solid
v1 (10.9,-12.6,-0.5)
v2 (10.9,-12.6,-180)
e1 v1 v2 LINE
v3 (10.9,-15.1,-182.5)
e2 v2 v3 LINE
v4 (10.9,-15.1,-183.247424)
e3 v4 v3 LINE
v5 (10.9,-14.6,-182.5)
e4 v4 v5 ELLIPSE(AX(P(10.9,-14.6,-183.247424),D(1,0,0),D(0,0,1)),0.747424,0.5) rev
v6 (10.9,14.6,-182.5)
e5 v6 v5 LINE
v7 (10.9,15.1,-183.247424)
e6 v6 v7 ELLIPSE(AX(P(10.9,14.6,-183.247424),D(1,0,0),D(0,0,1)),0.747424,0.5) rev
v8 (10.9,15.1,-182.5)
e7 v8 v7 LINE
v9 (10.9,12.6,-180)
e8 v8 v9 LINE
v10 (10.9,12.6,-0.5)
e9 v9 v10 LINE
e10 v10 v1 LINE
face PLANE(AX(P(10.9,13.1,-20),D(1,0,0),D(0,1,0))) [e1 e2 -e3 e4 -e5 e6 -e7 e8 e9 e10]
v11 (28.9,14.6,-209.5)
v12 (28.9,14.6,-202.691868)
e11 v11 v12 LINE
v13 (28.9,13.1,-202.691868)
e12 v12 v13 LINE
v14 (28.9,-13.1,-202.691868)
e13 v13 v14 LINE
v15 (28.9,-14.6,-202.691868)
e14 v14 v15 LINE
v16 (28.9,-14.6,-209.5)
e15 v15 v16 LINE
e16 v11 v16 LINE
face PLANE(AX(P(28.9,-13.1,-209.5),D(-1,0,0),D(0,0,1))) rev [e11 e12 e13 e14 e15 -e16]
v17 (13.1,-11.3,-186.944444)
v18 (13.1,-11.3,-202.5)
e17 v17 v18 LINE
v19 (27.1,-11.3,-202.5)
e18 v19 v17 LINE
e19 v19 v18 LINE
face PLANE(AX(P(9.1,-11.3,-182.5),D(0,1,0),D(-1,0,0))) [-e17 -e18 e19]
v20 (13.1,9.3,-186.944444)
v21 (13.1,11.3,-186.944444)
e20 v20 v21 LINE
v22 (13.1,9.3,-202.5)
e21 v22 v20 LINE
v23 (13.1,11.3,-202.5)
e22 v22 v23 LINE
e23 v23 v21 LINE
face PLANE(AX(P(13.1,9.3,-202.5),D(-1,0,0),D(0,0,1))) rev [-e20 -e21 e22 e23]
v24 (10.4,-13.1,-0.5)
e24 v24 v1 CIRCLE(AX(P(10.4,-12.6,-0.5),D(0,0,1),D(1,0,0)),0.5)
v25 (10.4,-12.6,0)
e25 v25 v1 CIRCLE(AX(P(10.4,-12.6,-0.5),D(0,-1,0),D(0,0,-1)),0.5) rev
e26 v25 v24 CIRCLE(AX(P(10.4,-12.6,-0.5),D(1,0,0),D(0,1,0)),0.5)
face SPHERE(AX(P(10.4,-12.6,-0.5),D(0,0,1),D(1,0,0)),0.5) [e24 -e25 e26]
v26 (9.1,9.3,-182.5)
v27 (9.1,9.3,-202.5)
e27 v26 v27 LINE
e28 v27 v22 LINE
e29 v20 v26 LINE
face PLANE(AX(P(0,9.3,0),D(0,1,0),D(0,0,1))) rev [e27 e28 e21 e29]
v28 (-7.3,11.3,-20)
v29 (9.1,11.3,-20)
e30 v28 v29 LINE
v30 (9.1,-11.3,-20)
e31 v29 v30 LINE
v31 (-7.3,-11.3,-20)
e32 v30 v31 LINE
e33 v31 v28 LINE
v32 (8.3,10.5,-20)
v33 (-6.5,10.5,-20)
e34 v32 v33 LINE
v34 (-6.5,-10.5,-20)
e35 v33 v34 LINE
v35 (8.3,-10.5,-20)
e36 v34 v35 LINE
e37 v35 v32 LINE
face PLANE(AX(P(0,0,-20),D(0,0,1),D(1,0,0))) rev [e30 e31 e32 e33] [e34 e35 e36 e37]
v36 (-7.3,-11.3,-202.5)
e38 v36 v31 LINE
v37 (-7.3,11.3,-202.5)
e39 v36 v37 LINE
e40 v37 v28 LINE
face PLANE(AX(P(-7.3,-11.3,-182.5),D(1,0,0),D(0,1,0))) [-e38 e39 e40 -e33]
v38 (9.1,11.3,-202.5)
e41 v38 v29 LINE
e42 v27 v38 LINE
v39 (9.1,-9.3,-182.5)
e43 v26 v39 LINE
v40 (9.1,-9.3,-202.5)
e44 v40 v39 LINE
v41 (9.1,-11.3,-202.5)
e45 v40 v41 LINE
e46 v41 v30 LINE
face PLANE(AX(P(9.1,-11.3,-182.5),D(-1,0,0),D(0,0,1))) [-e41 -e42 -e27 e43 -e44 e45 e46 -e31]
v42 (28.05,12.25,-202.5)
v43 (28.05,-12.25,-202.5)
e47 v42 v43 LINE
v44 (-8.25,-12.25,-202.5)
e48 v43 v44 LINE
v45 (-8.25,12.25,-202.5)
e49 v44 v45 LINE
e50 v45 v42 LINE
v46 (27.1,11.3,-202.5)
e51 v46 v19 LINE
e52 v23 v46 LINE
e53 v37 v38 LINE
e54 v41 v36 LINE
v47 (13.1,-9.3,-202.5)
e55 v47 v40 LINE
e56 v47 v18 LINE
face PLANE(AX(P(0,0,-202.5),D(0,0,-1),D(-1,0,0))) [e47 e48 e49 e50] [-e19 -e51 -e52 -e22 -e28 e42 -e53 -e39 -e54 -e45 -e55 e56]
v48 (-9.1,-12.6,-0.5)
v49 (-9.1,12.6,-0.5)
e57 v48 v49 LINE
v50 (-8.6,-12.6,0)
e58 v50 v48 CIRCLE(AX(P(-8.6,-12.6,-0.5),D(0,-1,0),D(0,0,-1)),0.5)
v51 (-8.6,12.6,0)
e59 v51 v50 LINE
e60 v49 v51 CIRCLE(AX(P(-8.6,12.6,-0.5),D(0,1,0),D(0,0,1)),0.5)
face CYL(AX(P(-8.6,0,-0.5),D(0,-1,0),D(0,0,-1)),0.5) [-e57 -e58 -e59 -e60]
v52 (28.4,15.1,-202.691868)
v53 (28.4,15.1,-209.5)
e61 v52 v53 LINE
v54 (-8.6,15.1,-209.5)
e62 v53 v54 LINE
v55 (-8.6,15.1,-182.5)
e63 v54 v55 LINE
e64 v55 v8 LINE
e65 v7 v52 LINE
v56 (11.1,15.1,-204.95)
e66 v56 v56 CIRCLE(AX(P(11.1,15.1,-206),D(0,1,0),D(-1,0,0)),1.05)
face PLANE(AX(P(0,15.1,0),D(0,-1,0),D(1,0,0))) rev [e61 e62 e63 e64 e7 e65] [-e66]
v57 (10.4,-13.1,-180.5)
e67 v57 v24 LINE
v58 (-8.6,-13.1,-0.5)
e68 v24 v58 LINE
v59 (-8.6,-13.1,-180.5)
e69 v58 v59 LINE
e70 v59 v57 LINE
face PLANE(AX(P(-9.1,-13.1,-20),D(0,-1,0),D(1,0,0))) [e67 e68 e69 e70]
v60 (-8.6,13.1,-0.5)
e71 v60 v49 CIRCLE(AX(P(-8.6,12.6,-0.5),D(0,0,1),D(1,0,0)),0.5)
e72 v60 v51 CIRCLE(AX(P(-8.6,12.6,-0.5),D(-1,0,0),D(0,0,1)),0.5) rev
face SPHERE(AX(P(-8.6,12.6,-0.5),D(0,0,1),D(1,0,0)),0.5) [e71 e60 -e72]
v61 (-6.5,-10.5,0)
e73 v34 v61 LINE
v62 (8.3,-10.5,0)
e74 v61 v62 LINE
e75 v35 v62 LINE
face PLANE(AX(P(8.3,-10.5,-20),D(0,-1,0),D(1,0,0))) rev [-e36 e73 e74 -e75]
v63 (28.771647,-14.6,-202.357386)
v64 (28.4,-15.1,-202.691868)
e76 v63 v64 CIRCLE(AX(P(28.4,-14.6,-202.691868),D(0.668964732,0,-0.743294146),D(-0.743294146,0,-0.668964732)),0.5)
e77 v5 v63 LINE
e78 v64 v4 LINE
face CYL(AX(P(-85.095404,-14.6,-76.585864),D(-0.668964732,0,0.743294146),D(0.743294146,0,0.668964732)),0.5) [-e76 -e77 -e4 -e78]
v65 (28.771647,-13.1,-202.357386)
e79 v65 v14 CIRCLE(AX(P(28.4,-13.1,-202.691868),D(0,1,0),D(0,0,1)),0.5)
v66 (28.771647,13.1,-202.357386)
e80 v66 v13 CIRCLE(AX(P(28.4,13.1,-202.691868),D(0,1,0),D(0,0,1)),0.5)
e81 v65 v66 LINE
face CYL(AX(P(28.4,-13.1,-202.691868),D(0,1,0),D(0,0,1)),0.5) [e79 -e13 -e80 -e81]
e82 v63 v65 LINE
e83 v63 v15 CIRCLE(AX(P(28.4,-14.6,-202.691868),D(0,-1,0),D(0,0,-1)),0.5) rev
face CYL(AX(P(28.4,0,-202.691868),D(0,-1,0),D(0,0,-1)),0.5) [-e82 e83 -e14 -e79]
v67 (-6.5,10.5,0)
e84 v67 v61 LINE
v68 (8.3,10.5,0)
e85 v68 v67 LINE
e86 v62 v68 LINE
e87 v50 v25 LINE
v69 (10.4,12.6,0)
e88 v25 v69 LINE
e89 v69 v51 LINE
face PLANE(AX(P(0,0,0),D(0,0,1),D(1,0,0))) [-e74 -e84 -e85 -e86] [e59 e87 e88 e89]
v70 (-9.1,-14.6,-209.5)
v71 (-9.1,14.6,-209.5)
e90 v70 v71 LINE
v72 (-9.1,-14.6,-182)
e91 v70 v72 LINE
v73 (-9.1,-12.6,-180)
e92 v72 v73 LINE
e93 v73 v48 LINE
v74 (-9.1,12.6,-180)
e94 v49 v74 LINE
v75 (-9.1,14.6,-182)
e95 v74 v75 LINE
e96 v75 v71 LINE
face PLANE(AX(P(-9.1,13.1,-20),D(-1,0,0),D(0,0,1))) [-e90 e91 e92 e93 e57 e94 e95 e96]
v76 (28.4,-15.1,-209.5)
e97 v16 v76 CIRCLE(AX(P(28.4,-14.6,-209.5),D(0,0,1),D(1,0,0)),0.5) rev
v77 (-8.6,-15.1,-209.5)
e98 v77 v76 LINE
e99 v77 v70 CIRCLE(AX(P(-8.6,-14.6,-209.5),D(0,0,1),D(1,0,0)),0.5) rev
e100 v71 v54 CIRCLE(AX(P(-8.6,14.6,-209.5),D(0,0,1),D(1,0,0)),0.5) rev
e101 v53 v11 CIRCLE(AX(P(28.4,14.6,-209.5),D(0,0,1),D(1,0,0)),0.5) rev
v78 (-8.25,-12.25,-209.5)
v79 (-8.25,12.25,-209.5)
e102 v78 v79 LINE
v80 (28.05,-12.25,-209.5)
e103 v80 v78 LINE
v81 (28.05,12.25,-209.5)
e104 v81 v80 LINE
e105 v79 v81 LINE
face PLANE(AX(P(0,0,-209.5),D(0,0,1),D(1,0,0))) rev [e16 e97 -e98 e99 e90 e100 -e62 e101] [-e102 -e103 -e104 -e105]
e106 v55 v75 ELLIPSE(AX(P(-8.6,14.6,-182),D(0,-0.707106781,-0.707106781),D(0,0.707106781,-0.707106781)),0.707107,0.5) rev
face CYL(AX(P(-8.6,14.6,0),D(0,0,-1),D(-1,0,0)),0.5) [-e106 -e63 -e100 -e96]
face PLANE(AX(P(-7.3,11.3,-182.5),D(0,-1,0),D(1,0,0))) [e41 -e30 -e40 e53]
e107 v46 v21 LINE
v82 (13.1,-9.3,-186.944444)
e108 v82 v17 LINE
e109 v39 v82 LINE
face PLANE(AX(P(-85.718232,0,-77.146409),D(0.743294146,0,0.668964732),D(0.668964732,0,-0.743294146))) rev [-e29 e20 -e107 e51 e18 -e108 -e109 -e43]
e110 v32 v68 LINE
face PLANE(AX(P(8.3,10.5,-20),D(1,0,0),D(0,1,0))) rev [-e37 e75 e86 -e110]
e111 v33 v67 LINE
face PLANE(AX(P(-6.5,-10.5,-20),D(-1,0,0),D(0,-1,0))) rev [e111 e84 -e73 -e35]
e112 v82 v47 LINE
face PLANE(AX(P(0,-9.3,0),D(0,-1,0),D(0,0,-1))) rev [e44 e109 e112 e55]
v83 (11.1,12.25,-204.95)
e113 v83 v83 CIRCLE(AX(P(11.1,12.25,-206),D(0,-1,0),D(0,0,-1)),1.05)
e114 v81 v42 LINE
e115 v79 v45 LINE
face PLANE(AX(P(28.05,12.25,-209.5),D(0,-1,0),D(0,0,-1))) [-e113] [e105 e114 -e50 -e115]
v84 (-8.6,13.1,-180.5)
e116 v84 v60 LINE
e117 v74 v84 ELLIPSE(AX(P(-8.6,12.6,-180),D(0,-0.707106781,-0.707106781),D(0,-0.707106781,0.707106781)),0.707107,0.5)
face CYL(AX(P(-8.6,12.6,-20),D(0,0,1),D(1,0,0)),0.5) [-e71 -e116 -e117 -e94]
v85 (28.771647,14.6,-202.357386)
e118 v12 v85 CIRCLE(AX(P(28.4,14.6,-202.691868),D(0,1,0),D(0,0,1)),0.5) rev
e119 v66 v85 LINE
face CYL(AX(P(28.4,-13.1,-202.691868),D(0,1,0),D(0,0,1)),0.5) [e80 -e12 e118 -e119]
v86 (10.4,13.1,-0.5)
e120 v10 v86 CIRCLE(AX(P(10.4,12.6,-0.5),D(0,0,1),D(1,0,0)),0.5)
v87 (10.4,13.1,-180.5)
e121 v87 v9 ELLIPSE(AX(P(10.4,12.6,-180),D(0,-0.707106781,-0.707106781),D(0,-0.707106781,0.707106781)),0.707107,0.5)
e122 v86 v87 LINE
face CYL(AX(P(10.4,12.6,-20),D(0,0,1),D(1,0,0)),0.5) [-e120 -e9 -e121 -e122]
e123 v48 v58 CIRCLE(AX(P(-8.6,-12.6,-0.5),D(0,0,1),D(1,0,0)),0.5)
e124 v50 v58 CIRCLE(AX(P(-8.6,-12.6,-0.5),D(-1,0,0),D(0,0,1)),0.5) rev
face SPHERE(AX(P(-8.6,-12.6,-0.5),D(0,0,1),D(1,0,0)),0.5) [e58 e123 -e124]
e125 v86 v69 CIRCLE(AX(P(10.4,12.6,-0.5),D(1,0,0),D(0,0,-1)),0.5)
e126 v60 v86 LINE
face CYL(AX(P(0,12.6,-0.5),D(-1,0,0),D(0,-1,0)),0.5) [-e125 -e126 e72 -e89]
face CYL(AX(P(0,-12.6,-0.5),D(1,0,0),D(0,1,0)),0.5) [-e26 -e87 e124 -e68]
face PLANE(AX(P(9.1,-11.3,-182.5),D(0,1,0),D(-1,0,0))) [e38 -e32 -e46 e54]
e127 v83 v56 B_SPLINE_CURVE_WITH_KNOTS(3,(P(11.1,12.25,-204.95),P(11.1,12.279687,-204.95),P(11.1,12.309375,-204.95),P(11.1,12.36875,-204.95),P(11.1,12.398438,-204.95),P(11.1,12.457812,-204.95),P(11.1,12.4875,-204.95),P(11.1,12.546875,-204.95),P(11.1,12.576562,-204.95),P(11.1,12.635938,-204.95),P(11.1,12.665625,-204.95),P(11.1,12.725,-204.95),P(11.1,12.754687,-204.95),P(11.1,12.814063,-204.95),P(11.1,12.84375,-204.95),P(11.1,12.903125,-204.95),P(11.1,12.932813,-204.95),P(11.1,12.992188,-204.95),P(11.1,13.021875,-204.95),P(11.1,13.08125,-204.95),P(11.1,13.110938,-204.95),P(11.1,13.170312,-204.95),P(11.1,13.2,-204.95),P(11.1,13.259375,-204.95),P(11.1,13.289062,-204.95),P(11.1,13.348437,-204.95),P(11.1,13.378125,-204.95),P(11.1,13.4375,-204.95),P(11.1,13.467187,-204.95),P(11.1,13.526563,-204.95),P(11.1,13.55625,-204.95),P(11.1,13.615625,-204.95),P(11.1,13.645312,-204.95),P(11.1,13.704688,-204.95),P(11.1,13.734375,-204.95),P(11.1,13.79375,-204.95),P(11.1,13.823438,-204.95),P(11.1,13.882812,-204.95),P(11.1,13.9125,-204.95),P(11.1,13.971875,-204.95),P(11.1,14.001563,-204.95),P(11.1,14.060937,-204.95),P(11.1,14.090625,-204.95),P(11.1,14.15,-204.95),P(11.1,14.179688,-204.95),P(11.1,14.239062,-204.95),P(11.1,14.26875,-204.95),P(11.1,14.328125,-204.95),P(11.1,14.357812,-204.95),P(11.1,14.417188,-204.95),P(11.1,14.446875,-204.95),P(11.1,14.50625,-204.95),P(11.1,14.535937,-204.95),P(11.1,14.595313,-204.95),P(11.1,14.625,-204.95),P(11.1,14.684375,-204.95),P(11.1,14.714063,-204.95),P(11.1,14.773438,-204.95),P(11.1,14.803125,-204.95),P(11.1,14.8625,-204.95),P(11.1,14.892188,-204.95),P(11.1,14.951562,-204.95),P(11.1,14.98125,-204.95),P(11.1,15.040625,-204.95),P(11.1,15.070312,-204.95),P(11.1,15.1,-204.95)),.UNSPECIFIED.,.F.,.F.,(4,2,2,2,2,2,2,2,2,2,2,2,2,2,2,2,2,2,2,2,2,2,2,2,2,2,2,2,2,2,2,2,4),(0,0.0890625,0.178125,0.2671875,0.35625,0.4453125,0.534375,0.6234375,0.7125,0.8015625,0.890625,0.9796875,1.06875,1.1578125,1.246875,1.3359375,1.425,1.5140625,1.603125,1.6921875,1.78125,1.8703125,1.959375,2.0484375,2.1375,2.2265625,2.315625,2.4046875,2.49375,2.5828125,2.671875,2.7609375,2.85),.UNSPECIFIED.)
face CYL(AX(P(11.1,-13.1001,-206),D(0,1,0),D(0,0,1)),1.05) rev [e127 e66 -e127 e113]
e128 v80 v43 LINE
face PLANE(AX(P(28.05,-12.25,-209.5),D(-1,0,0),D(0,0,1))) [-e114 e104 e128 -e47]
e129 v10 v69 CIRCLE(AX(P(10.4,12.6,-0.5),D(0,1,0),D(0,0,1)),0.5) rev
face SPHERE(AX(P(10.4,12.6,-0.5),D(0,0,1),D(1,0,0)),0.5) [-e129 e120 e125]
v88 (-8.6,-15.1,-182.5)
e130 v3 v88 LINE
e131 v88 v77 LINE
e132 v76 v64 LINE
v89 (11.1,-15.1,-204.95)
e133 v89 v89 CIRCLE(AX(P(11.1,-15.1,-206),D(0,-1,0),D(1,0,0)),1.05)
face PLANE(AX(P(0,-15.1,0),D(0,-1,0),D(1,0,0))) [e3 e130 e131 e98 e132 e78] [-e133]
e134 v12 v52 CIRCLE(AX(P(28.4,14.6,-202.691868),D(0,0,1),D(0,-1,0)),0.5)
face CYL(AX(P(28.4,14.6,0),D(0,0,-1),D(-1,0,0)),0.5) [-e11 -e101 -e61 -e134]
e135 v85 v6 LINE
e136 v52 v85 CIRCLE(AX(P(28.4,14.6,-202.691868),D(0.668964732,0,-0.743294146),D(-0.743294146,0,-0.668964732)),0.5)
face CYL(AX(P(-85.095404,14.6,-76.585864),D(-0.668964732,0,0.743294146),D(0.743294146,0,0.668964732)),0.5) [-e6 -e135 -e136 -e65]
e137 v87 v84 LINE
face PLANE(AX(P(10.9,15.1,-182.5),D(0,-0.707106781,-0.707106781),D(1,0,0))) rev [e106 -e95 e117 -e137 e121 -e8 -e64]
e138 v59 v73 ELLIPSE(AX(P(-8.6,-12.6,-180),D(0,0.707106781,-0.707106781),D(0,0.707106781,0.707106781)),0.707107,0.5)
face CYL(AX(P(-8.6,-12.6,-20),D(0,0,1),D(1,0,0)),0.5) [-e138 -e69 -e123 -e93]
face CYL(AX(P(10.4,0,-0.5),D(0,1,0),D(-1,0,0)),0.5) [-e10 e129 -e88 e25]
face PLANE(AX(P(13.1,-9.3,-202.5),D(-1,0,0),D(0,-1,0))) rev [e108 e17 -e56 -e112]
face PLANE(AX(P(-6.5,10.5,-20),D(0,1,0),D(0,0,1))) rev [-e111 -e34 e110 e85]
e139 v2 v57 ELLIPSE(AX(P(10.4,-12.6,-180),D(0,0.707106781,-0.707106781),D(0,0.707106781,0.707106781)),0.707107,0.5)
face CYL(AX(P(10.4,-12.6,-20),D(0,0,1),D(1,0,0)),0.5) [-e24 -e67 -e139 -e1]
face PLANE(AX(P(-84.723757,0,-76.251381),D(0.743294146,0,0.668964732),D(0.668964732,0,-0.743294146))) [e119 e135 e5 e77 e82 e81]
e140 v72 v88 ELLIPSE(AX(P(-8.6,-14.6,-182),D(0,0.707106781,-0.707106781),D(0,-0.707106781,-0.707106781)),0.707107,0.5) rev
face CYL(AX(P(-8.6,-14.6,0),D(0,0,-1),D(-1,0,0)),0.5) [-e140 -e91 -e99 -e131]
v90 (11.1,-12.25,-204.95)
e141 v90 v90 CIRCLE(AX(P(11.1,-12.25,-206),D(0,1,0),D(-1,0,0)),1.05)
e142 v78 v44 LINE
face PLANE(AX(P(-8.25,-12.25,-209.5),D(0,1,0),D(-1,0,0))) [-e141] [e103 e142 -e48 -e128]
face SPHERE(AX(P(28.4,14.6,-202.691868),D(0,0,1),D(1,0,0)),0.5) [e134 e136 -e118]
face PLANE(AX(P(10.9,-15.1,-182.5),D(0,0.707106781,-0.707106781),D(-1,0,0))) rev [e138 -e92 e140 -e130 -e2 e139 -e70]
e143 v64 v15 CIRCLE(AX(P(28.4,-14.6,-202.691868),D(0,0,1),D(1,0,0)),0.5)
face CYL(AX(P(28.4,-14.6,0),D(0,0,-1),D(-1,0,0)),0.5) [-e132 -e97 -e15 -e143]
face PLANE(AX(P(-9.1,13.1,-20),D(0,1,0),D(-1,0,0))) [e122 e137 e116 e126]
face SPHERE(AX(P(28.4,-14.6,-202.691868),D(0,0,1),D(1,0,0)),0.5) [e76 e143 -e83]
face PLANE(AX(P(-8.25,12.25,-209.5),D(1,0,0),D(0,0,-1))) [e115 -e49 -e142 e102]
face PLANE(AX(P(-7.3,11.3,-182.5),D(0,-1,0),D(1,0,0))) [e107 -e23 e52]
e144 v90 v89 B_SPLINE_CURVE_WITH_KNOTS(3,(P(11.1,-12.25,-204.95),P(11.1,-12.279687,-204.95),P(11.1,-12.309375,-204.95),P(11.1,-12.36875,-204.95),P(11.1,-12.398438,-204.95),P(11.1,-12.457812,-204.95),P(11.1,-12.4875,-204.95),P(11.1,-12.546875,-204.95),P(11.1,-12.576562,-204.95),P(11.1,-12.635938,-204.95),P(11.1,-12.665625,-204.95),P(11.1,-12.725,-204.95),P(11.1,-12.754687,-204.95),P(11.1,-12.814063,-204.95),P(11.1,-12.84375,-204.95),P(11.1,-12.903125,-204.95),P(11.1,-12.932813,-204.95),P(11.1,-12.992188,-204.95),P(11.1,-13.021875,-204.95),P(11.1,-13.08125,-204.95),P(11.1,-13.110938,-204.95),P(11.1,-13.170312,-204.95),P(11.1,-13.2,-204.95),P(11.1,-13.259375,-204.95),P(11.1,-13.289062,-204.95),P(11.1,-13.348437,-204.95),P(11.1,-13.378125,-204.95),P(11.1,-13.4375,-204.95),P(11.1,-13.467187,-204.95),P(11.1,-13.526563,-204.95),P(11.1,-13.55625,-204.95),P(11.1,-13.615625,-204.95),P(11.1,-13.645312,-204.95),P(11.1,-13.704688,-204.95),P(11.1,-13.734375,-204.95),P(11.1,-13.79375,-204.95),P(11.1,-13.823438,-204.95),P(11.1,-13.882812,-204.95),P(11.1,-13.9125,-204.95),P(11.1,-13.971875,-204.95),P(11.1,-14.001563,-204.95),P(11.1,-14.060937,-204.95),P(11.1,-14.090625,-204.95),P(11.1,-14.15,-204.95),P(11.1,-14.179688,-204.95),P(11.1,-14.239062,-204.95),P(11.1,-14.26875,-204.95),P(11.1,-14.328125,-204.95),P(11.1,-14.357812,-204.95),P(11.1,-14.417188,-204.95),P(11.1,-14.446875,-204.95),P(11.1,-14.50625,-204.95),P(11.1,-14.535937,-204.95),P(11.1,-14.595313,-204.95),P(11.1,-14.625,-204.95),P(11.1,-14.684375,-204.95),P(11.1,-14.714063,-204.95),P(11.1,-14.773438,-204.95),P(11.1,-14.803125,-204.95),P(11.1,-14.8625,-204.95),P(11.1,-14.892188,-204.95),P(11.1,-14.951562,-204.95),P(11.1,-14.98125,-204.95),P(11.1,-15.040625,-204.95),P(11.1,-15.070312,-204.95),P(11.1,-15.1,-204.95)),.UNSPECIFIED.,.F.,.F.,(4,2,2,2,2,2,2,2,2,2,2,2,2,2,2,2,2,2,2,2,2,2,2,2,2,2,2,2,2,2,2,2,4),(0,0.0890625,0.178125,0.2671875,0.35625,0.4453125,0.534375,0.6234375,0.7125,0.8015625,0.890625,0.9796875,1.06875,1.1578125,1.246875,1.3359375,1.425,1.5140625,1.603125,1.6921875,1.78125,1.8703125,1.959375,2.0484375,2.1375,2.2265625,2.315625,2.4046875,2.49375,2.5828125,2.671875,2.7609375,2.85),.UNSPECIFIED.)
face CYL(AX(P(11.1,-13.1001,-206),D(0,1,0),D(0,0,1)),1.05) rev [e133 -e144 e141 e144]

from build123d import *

# Parameters (mm, degrees)
SKETCH1_W               = 20
SKETCH1_H               = 26.2
SKETCH1_W_2             = 14.8
SKETCH1_H_2             = 21
TOP_DEPTH               = 20
SKETCH2_W               = 20
SKETCH2_H               = 26.2
SKETCH2_W_2             = 16.4
SKETCH2_H_2             = 22.6
BODY_DEPTH              = 162.5
SKETCH13_W              = 38
SKETCH13_H              = 26.2
SKETCH13_W_2            = 36.3
SKETCH13_H_2            = 24.5
INSERT_DEPTH            = 7
CUT_EXTRUDE1_DEPTH      = 212.889287248
CUT_EXTRUDE1_DEPTH_BACK = 212.889287248
SKETCH15_R              = 1.05
BOSS_EXTRUDE1_DEPTH     = 2
BOSS_EXTRUDE2_DEPTH     = 2
SKETCH19_R              = 1.05
BOSS_EXTRUDE3_DEPTH     = 2
BOSS_EXTRUDE4_START     = 2
SKETCH20_R              = 1.05
BOSS_EXTRUDE4_DEPTH     = 2
CHAMFER1_SIZE           = 2
FILLET1_R               = 0.5


# Some blends are built 0.0001 mm under size
with BuildPart() as part:
    # Sketch1 → Top (new body)
    with BuildSketch(Plane.XY):
        with Locations((0.9, 0)):
            Rectangle(SKETCH1_W, SKETCH1_H)
        with Locations((0.9, 0)):
            Rectangle(SKETCH1_W_2, SKETCH1_H_2, mode=Mode.SUBTRACT)
    extrude(amount=-TOP_DEPTH)

    # Sketch2 → Body (add)
    with BuildSketch(Plane(origin=(0, 0, -20), x_dir=(-1, 0, 0), z_dir=(0, 0, -1))):
        with Locations((-0.9, 0)):
            Rectangle(SKETCH2_W, SKETCH2_H)
        with Locations((-0.9, 0)):
            Rectangle(SKETCH2_W_2, SKETCH2_H_2, mode=Mode.SUBTRACT)
    extrude(amount=BODY_DEPTH)

    # Sketch10 → Loft3 section 0
    with BuildSketch(Plane(origin=(0, 0, -202.5), x_dir=(-1, 0, 0), z_dir=(0, 0, -1))):
        with BuildLine():
            Line((-28.9, -13.1), (9.1, -13.1))
            Line((9.1, -13.1), (9.1, 13.1))
            Line((9.1, 13.1), (-28.9, 13.1))
            Line((-28.9, 13.1), (-28.9, -13.1))
        make_face()
    # Sketch8 → Loft3 section 1
    with BuildSketch(Plane(origin=(0, 0, -182.5), x_dir=(-1, 0, 0), z_dir=(0, 0, -1))):
        with BuildLine():
            Line((9.1, 13.1), (-10.9, 13.1))
            Line((-10.9, 13.1), (-10.9, -13.1))
            Line((-10.9, -13.1), (9.1, -13.1))
            Line((9.1, -13.1), (9.1, 13.1))
        make_face()
    loft()

    # Sketch12 → Cut-Loft1 section 0
    with BuildSketch(Plane(origin=(0, 0, -202.5), x_dir=(-1, 0, 0), z_dir=(0, 0, -1))):
        with BuildLine():
            Line((7.3, -11.3), (7.3, 11.3))
            Line((7.3, 11.3), (-27.1, 11.3))
            Line((-27.1, 11.3), (-27.1, -11.3))
            Line((-27.1, -11.3), (7.3, -11.3))
        make_face()
    # Sketch11 → Cut-Loft1 section 1
    with BuildSketch(Plane(origin=(0, 0, -182.5), x_dir=(-1, 0, 0), z_dir=(0, 0, -1))):
        with BuildLine():
            Line((-9.1, 11.3), (-9.1, -11.3))
            Line((-9.1, -11.3), (7.3, -11.3))
            Line((7.3, -11.3), (7.3, 11.3))
            Line((7.3, 11.3), (-9.1, 11.3))
        make_face()
    loft(mode=Mode.SUBTRACT)

    # Sketch13 → Insert (add)
    with BuildSketch(Plane(origin=(0, 0, -202.5), x_dir=(-1, 0, 0), z_dir=(0, 0, -1))):
        with Locations((-9.9, 0)):
            Rectangle(SKETCH13_W, SKETCH13_H)
        with Locations((-9.9, 0)):
            Rectangle(SKETCH13_W_2, SKETCH13_H_2, mode=Mode.SUBTRACT)
    extrude(amount=INSERT_DEPTH)

    # Sketch15 → Cut-Extrude1 (cut, two sides: drawn at the far end of the back side and taken through both)
    with BuildSketch(Plane(origin=(0, 0, 0), x_dir=(1, 0, 0), z_dir=(0, 1, 0)).offset(-CUT_EXTRUDE1_DEPTH_BACK)):
        with Locations(Location((11.1, 206, 0), (0, 0, 270))):
            Circle(SKETCH15_R)
    extrude(amount=CUT_EXTRUDE1_DEPTH + CUT_EXTRUDE1_DEPTH_BACK, mode=Mode.SUBTRACT)

    # Sketch17 → Boss-Extrude1 (add)
    with BuildSketch(Plane.XZ.offset(-11.3)):
        Polygon((13.1, -202.5), (13.1, -186.944444444), (9.1, -182.5), (9.1, -202.5), align=None)
    extrude(amount=BOSS_EXTRUDE1_DEPTH)

    # Sketch18 → Boss-Extrude2 (add)
    with BuildSketch(Plane(origin=(0, -11.3, 0), x_dir=(1, 0, 0), z_dir=(0, 1, 0))):
        Polygon((13.1, 202.5), (9.1, 202.5), (9.1, 182.5), (13.1, 186.944444444), align=None)
    extrude(amount=BOSS_EXTRUDE2_DEPTH)

    # Sketch19 → Boss-Extrude3 (add)
    with BuildSketch(Plane.XZ.offset(13.1)):
        Polygon((28.9, -209.5), (-9.1, -209.5), (-9.1, -182.5), (10.9, -182.5), (28.9, -202.5), align=None)
        with Locations(Location((11.1, -206, 0), (0, 0, 90))):
            Circle(SKETCH19_R, mode=Mode.SUBTRACT)
    extrude(amount=BOSS_EXTRUDE3_DEPTH)

    # Sketch20 → Boss-Extrude4 (add)
    with BuildSketch(Plane(origin=(0, 13.1, 0), x_dir=(1, 0, 0), z_dir=(0, 1, 0)).offset(BOSS_EXTRUDE4_START)):
        Polygon((-9.1, 209.5), (28.9, 209.5), (28.9, 202.5), (10.9, 182.5), (-9.1, 182.5), align=None)
        with Locations(Location((11.1, 206, 0), (0, 0, 270))):
            Circle(SKETCH20_R, mode=Mode.SUBTRACT)
    extrude(amount=-BOSS_EXTRUDE4_DEPTH)

    # Chamfer1
    chamfer1_edges = [part.edges().sort_by_distance(p)[0] for p in [
        (0.9, 13.1, -182.5),
        (0.9, -13.1, -182.5),
    ]]
    chamfer(chamfer1_edges, length=CHAMFER1_SIZE - 0.0001)  # a hair under: the kernel refuses the full size

    # Fillet1
    # the kernel refuses this fillet: 0.5 mm, written as the material it takes off along each edge
    with BuildSketch(Plane(origin=(28.4, -14.6, -202.691868003), x_dir=(0.7432941462471656, 0, 0.6689647316224505), z_dir=(0, -1, 0))) as fillet1_piece_1_section:
        Polygon((0, 0), (FILLET1_R * 1.02, 0), (FILLET1_R * 1.02, -FILLET1_R * 0.391410725335), (FILLET1_R * 0.758160029172, -FILLET1_R * 0.682344026255), align=None)
    fillet1_piece_1 = extrude(amount=FILLET1_R * 1.02, mode=Mode.PRIVATE)
    fillet1_piece_1 = fillet1_piece_1 - Plane(origin=(28.4, -14.6, -202.691868003), x_dir=(-0.9336204116896668, 0, -0.3582637671833662), z_dir=(0, -1, 0)) * Sphere(FILLET1_R, mode=Mode.PRIVATE)
    add(fillet1_piece_1, mode=Mode.SUBTRACT)
    with BuildSketch(Plane(origin=(28.4, 14.6, -202.691868003), x_dir=(1, 0, 0), z_dir=(0, 1, 0))) as fillet1_piece_2_section:
        Polygon((0, 0), (FILLET1_R * 1.02, 0), (FILLET1_R * 1.02, -FILLET1_R * 0.391410725335), (FILLET1_R * 0.758160029172, -FILLET1_R * 0.682344026255), align=None)
    fillet1_piece_2 = extrude(amount=FILLET1_R * 1.02, mode=Mode.PRIVATE)
    fillet1_piece_2 = fillet1_piece_2 - Plane(origin=(28.4, 14.6, -202.691868003), x_dir=(-0.9336204116896668, 0, -0.3582637671833662), z_dir=(0, 1, 0)) * Sphere(FILLET1_R, mode=Mode.PRIVATE)
    add(fillet1_piece_2, mode=Mode.SUBTRACT)
    with BuildSketch(Plane(origin=(10.4, -12.6, -0.5), x_dir=(0, -1, 0), z_dir=(1, 0, 0))) as fillet1_piece_3_section:
        Polygon((0, 0), (FILLET1_R * 1.02, 0), (FILLET1_R * 1.02, -FILLET1_R * 1.02), (0, -FILLET1_R * 1.02), align=None)
    fillet1_piece_3 = extrude(amount=FILLET1_R * 1.02, mode=Mode.PRIVATE)
    fillet1_piece_3 = fillet1_piece_3 - Plane(origin=(10.4, -12.6, -0.5), x_dir=(0, 0.7071067811865475, -0.7071067811865475), z_dir=(1, 0, 0)) * Sphere(FILLET1_R, mode=Mode.PRIVATE)
    add(fillet1_piece_3, mode=Mode.SUBTRACT)
    with BuildSketch(Plane(origin=(-8.6, -12.6, -0.5), x_dir=(0, -1, 0), z_dir=(-1, 0, 0))) as fillet1_piece_4_section:
        Polygon((0, 0), (FILLET1_R * 1.02, 0), (FILLET1_R * 1.02, FILLET1_R * 1.02), (0, FILLET1_R * 1.02), align=None)
    fillet1_piece_4 = extrude(amount=FILLET1_R * 1.02, mode=Mode.PRIVATE)
    fillet1_piece_4 = fillet1_piece_4 - Plane(origin=(-8.6, -12.6, -0.5), x_dir=(0, 0.7071067811865475, -0.7071067811865475), z_dir=(-1, 0, 0)) * Sphere(FILLET1_R, mode=Mode.PRIVATE)
    add(fillet1_piece_4, mode=Mode.SUBTRACT)
    with BuildSketch(Plane(origin=(-8.6, 12.6, -0.5), x_dir=(0, 0, 1), z_dir=(-1, 0, 0))) as fillet1_piece_5_section:
        Polygon((0, 0), (FILLET1_R * 1.02, 0), (FILLET1_R * 1.02, FILLET1_R * 1.02), (0, FILLET1_R * 1.02), align=None)
    fillet1_piece_5 = extrude(amount=FILLET1_R * 1.02, mode=Mode.PRIVATE)
    fillet1_piece_5 = fillet1_piece_5 - Plane(origin=(-8.6, 12.6, -0.5), x_dir=(0, -0.7071067811865475, -0.7071067811865475), z_dir=(-1, 0, 0)) * Sphere(FILLET1_R, mode=Mode.PRIVATE)
    add(fillet1_piece_5, mode=Mode.SUBTRACT)
    with BuildSketch(Plane(origin=(10.4, 12.6, -0.5), x_dir=(0, 0, 1), z_dir=(1, 0, 0))) as fillet1_piece_6_section:
        Polygon((0, 0), (FILLET1_R * 1.02, 0), (FILLET1_R * 1.02, -FILLET1_R * 1.02), (0, -FILLET1_R * 1.02), align=None)
    fillet1_piece_6 = extrude(amount=FILLET1_R * 1.02, mode=Mode.PRIVATE)
    fillet1_piece_6 = fillet1_piece_6 - Plane(origin=(10.4, 12.6, -0.5), x_dir=(0, -0.7071067811865475, -0.7071067811865475), z_dir=(1, 0, 0)) * Sphere(FILLET1_R, mode=Mode.PRIVATE)
    add(fillet1_piece_6, mode=Mode.SUBTRACT)
    with BuildSketch(Plane(origin=(28.9, -15.1, -202.691868003), x_dir=(0, 1, 0), z_dir=(0, 0, -1))) as fillet1_piece_7:
        with BuildLine():
            CenterArc((FILLET1_R, -FILLET1_R), FILLET1_R, 90, 90)
            Line((0, -FILLET1_R), (0, 0))
            Line((0, 0), (FILLET1_R, 0))
        make_face()
    extrude(amount=8.058131997, mode=Mode.SUBTRACT)
    with BuildSketch(Plane(origin=(10.063794085, -15.1, -181.570882317), x_dir=(-0.7432941462471663, 0, -0.6689647316224498), z_dir=(0.6689647316224498, 0, -0.7432941462471663))) as fillet1_piece_8_section:
        with BuildLine():
            CenterArc((FILLET1_R, FILLET1_R), FILLET1_R, 180, 90)
            Line((0, FILLET1_R), (0, 0))
            Line((0, 0), (FILLET1_R, 0))
        make_face()
    fillet1_piece_8 = extrude(amount=27.965380092, mode=Mode.PRIVATE)
    fillet1_piece_8 = split(fillet1_piece_8, bisect_by=Plane(origin=(10.9, -14.988099969, -192.54912701), z_dir=(1, 0, 0)), keep=Keep.TOP, mode=Mode.PRIVATE)
    add(fillet1_piece_8, mode=Mode.SUBTRACT)
    with BuildSketch(Plane(origin=(-9.1, -15.1, -210.75), x_dir=(1, 0, 0), z_dir=(0, 0, 1)), Plane(origin=(-9.1, 15.1, -181.25), x_dir=(1, 0, 0), z_dir=(0, 0, -1))) as fillet1_piece_9:
        with BuildLine():
            CenterArc((FILLET1_R, FILLET1_R), FILLET1_R, 180, 90)
            Line((0, FILLET1_R), (0, 0))
            Line((0, 0), (FILLET1_R, 0))
        make_face()
    extrude(amount=29.5, mode=Mode.SUBTRACT)
    with BuildSketch(Plane(origin=(28.9, -14.6, -202.5), x_dir=(0, 0, -1), z_dir=(0, 1, 0))) as fillet1_piece_10:
        with BuildLine():
            CenterArc((FILLET1_R * 0.38373600523, FILLET1_R), FILLET1_R, 228.012787504, 41.987212496)
            Line((-FILLET1_R * 0.285228726392, FILLET1_R * 0.256705853753), (0, 0))
            Line((0, 0), (FILLET1_R * 0.38373600523, 0))
        make_face()
    extrude(amount=29.2, mode=Mode.SUBTRACT)
    with BuildSketch(Plane(origin=(28.771647073, 15.1, -202.357385637), x_dir=(-0.7432941462471662, 0, -0.66896473162245), z_dir=(-0.66896473162245, 0, 0.743294146247166))) as fillet1_piece_11_section:
        with BuildLine():
            CenterArc((FILLET1_R, FILLET1_R), FILLET1_R, 180, 90)
            Line((0, FILLET1_R), (0, 0))
            Line((0, 0), (FILLET1_R, 0))
        make_face()
    fillet1_piece_11 = extrude(amount=27.965380092, mode=Mode.PRIVATE)
    fillet1_piece_11 = split(fillet1_piece_11, bisect_by=Plane(origin=(10.9, 14.988099969, -192.54912701), z_dir=(1, 0, 0)), keep=Keep.TOP, mode=Mode.PRIVATE)
    add(fillet1_piece_11, mode=Mode.SUBTRACT)
    with BuildSketch(Plane(origin=(28.9, 15.1, -210.75), x_dir=(-1, 0, 0), z_dir=(0, 0, 1))) as fillet1_piece_12:
        with BuildLine():
            CenterArc((FILLET1_R, FILLET1_R), FILLET1_R, 180, 90)
            Line((0, FILLET1_R), (0, 0))
            Line((0, 0), (FILLET1_R, 0))
        make_face()
    extrude(amount=8.058131997, mode=Mode.SUBTRACT)
    with BuildSketch(Plane(origin=(10.9, -13.1, -0.5), x_dir=(0, 1, 0), z_dir=(0, 0, -1))) as fillet1_piece_13_section:
        with BuildLine():
            CenterArc((FILLET1_R, -FILLET1_R), FILLET1_R, 90, 90)
            Line((0, -FILLET1_R), (0, 0))
            Line((0, 0), (FILLET1_R, 0))
        make_face()
    fillet1_piece_13 = extrude(amount=181.2501, mode=Mode.PRIVATE)
    fillet1_piece_13 = split(fillet1_piece_13, bisect_by=Plane(origin=(10.788287286, 31.983751331, -135.416348669), z_dir=(2.2498580104233527e-15, -0.7071067811865469, 0.7071067811865481)), keep=Keep.TOP, mode=Mode.PRIVATE)
    add(fillet1_piece_13, mode=Mode.SUBTRACT)
    with BuildSketch(Plane(origin=(-9.1, -13.1, -0.5), x_dir=(0, 1, 0), z_dir=(0, 0, -1))) as fillet1_piece_14_section:
        with BuildLine():
            CenterArc((FILLET1_R, FILLET1_R), FILLET1_R, 180, 90)
            Line((0, FILLET1_R), (0, 0))
            Line((0, 0), (FILLET1_R, 0))
        make_face()
    fillet1_piece_14 = extrude(amount=181.2501, mode=Mode.PRIVATE)
    fillet1_piece_14 = split(fillet1_piece_14, bisect_by=Plane(origin=(-8.988287286, 31.983751331, -135.416348669), z_dir=(2.2498580104233527e-15, -0.7071067811865469, 0.7071067811865481)), keep=Keep.TOP, mode=Mode.PRIVATE)
    add(fillet1_piece_14, mode=Mode.SUBTRACT)
    with BuildSketch(Plane(origin=(-9.1, 13.1, -181.7501), x_dir=(0, -1, 0), z_dir=(0, 0, 1))) as fillet1_piece_15_section:
        with BuildLine():
            CenterArc((FILLET1_R, FILLET1_R), FILLET1_R, 180, 90)
            Line((0, FILLET1_R), (0, 0))
            Line((0, 0), (FILLET1_R, 0))
        make_face()
    fillet1_piece_15 = extrude(amount=181.2501, mode=Mode.PRIVATE)
    fillet1_piece_15 = split(fillet1_piece_15, bisect_by=Plane(origin=(-8.988287286, -31.983751331, -135.416348669), z_dir=(0, 0.7071067811865469, 0.7071067811865482)), keep=Keep.TOP, mode=Mode.PRIVATE)
    add(fillet1_piece_15, mode=Mode.SUBTRACT)
    with BuildSketch(Plane(origin=(10.9, 13.1, -181.7501), x_dir=(0, -1, 0), z_dir=(0, 0, 1))) as fillet1_piece_16_section:
        with BuildLine():
            CenterArc((FILLET1_R, -FILLET1_R), FILLET1_R, 90, 90)
            Line((0, -FILLET1_R), (0, 0))
            Line((0, 0), (FILLET1_R, 0))
        make_face()
    fillet1_piece_16 = extrude(amount=181.2501, mode=Mode.PRIVATE)
    fillet1_piece_16 = split(fillet1_piece_16, bisect_by=Plane(origin=(10.788287286, -31.983751331, -135.416348669), z_dir=(0, 0.7071067811865469, 0.7071067811865482)), keep=Keep.TOP, mode=Mode.PRIVATE)
    add(fillet1_piece_16, mode=Mode.SUBTRACT)
    with BuildSketch(Plane(origin=(-8.6, 13.1, 0), x_dir=(0, -1, 0), z_dir=(1, 0, 0)), Plane(origin=(10.4, -13.1, 0), x_dir=(0, 1, 0), z_dir=(-1, 0, 0))) as fillet1_piece_17:
        with BuildLine():
            CenterArc((FILLET1_R, FILLET1_R), FILLET1_R, 180, 90)
            Line((0, FILLET1_R), (0, 0))
            Line((0, 0), (FILLET1_R, 0))
        make_face()
    extrude(amount=19, mode=Mode.SUBTRACT)
    with BuildSketch(Plane(origin=(10.9, 12.6, 0), x_dir=(0, 0, -1), z_dir=(0, -1, 0))) as fillet1_piece_18:
        with BuildLine():
            CenterArc((FILLET1_R, -FILLET1_R), FILLET1_R, 90, 90)
            Line((0, -FILLET1_R), (0, 0))
            Line((0, 0), (FILLET1_R, 0))
        make_face()
    extrude(amount=25.2, mode=Mode.SUBTRACT)
    with BuildSketch(Plane(origin=(-9.1, -12.6, 0), x_dir=(1, 0, 0), z_dir=(0, 1, 0))) as fillet1_piece_19:
        with BuildLine():
            CenterArc((FILLET1_R, FILLET1_R), FILLET1_R, 180, 90)
            Line((0, FILLET1_R), (0, 0))
            Line((0, 0), (FILLET1_R, 0))
        make_face()
    extrude(amount=25.2, mode=Mode.SUBTRACT)


solid = part.part
